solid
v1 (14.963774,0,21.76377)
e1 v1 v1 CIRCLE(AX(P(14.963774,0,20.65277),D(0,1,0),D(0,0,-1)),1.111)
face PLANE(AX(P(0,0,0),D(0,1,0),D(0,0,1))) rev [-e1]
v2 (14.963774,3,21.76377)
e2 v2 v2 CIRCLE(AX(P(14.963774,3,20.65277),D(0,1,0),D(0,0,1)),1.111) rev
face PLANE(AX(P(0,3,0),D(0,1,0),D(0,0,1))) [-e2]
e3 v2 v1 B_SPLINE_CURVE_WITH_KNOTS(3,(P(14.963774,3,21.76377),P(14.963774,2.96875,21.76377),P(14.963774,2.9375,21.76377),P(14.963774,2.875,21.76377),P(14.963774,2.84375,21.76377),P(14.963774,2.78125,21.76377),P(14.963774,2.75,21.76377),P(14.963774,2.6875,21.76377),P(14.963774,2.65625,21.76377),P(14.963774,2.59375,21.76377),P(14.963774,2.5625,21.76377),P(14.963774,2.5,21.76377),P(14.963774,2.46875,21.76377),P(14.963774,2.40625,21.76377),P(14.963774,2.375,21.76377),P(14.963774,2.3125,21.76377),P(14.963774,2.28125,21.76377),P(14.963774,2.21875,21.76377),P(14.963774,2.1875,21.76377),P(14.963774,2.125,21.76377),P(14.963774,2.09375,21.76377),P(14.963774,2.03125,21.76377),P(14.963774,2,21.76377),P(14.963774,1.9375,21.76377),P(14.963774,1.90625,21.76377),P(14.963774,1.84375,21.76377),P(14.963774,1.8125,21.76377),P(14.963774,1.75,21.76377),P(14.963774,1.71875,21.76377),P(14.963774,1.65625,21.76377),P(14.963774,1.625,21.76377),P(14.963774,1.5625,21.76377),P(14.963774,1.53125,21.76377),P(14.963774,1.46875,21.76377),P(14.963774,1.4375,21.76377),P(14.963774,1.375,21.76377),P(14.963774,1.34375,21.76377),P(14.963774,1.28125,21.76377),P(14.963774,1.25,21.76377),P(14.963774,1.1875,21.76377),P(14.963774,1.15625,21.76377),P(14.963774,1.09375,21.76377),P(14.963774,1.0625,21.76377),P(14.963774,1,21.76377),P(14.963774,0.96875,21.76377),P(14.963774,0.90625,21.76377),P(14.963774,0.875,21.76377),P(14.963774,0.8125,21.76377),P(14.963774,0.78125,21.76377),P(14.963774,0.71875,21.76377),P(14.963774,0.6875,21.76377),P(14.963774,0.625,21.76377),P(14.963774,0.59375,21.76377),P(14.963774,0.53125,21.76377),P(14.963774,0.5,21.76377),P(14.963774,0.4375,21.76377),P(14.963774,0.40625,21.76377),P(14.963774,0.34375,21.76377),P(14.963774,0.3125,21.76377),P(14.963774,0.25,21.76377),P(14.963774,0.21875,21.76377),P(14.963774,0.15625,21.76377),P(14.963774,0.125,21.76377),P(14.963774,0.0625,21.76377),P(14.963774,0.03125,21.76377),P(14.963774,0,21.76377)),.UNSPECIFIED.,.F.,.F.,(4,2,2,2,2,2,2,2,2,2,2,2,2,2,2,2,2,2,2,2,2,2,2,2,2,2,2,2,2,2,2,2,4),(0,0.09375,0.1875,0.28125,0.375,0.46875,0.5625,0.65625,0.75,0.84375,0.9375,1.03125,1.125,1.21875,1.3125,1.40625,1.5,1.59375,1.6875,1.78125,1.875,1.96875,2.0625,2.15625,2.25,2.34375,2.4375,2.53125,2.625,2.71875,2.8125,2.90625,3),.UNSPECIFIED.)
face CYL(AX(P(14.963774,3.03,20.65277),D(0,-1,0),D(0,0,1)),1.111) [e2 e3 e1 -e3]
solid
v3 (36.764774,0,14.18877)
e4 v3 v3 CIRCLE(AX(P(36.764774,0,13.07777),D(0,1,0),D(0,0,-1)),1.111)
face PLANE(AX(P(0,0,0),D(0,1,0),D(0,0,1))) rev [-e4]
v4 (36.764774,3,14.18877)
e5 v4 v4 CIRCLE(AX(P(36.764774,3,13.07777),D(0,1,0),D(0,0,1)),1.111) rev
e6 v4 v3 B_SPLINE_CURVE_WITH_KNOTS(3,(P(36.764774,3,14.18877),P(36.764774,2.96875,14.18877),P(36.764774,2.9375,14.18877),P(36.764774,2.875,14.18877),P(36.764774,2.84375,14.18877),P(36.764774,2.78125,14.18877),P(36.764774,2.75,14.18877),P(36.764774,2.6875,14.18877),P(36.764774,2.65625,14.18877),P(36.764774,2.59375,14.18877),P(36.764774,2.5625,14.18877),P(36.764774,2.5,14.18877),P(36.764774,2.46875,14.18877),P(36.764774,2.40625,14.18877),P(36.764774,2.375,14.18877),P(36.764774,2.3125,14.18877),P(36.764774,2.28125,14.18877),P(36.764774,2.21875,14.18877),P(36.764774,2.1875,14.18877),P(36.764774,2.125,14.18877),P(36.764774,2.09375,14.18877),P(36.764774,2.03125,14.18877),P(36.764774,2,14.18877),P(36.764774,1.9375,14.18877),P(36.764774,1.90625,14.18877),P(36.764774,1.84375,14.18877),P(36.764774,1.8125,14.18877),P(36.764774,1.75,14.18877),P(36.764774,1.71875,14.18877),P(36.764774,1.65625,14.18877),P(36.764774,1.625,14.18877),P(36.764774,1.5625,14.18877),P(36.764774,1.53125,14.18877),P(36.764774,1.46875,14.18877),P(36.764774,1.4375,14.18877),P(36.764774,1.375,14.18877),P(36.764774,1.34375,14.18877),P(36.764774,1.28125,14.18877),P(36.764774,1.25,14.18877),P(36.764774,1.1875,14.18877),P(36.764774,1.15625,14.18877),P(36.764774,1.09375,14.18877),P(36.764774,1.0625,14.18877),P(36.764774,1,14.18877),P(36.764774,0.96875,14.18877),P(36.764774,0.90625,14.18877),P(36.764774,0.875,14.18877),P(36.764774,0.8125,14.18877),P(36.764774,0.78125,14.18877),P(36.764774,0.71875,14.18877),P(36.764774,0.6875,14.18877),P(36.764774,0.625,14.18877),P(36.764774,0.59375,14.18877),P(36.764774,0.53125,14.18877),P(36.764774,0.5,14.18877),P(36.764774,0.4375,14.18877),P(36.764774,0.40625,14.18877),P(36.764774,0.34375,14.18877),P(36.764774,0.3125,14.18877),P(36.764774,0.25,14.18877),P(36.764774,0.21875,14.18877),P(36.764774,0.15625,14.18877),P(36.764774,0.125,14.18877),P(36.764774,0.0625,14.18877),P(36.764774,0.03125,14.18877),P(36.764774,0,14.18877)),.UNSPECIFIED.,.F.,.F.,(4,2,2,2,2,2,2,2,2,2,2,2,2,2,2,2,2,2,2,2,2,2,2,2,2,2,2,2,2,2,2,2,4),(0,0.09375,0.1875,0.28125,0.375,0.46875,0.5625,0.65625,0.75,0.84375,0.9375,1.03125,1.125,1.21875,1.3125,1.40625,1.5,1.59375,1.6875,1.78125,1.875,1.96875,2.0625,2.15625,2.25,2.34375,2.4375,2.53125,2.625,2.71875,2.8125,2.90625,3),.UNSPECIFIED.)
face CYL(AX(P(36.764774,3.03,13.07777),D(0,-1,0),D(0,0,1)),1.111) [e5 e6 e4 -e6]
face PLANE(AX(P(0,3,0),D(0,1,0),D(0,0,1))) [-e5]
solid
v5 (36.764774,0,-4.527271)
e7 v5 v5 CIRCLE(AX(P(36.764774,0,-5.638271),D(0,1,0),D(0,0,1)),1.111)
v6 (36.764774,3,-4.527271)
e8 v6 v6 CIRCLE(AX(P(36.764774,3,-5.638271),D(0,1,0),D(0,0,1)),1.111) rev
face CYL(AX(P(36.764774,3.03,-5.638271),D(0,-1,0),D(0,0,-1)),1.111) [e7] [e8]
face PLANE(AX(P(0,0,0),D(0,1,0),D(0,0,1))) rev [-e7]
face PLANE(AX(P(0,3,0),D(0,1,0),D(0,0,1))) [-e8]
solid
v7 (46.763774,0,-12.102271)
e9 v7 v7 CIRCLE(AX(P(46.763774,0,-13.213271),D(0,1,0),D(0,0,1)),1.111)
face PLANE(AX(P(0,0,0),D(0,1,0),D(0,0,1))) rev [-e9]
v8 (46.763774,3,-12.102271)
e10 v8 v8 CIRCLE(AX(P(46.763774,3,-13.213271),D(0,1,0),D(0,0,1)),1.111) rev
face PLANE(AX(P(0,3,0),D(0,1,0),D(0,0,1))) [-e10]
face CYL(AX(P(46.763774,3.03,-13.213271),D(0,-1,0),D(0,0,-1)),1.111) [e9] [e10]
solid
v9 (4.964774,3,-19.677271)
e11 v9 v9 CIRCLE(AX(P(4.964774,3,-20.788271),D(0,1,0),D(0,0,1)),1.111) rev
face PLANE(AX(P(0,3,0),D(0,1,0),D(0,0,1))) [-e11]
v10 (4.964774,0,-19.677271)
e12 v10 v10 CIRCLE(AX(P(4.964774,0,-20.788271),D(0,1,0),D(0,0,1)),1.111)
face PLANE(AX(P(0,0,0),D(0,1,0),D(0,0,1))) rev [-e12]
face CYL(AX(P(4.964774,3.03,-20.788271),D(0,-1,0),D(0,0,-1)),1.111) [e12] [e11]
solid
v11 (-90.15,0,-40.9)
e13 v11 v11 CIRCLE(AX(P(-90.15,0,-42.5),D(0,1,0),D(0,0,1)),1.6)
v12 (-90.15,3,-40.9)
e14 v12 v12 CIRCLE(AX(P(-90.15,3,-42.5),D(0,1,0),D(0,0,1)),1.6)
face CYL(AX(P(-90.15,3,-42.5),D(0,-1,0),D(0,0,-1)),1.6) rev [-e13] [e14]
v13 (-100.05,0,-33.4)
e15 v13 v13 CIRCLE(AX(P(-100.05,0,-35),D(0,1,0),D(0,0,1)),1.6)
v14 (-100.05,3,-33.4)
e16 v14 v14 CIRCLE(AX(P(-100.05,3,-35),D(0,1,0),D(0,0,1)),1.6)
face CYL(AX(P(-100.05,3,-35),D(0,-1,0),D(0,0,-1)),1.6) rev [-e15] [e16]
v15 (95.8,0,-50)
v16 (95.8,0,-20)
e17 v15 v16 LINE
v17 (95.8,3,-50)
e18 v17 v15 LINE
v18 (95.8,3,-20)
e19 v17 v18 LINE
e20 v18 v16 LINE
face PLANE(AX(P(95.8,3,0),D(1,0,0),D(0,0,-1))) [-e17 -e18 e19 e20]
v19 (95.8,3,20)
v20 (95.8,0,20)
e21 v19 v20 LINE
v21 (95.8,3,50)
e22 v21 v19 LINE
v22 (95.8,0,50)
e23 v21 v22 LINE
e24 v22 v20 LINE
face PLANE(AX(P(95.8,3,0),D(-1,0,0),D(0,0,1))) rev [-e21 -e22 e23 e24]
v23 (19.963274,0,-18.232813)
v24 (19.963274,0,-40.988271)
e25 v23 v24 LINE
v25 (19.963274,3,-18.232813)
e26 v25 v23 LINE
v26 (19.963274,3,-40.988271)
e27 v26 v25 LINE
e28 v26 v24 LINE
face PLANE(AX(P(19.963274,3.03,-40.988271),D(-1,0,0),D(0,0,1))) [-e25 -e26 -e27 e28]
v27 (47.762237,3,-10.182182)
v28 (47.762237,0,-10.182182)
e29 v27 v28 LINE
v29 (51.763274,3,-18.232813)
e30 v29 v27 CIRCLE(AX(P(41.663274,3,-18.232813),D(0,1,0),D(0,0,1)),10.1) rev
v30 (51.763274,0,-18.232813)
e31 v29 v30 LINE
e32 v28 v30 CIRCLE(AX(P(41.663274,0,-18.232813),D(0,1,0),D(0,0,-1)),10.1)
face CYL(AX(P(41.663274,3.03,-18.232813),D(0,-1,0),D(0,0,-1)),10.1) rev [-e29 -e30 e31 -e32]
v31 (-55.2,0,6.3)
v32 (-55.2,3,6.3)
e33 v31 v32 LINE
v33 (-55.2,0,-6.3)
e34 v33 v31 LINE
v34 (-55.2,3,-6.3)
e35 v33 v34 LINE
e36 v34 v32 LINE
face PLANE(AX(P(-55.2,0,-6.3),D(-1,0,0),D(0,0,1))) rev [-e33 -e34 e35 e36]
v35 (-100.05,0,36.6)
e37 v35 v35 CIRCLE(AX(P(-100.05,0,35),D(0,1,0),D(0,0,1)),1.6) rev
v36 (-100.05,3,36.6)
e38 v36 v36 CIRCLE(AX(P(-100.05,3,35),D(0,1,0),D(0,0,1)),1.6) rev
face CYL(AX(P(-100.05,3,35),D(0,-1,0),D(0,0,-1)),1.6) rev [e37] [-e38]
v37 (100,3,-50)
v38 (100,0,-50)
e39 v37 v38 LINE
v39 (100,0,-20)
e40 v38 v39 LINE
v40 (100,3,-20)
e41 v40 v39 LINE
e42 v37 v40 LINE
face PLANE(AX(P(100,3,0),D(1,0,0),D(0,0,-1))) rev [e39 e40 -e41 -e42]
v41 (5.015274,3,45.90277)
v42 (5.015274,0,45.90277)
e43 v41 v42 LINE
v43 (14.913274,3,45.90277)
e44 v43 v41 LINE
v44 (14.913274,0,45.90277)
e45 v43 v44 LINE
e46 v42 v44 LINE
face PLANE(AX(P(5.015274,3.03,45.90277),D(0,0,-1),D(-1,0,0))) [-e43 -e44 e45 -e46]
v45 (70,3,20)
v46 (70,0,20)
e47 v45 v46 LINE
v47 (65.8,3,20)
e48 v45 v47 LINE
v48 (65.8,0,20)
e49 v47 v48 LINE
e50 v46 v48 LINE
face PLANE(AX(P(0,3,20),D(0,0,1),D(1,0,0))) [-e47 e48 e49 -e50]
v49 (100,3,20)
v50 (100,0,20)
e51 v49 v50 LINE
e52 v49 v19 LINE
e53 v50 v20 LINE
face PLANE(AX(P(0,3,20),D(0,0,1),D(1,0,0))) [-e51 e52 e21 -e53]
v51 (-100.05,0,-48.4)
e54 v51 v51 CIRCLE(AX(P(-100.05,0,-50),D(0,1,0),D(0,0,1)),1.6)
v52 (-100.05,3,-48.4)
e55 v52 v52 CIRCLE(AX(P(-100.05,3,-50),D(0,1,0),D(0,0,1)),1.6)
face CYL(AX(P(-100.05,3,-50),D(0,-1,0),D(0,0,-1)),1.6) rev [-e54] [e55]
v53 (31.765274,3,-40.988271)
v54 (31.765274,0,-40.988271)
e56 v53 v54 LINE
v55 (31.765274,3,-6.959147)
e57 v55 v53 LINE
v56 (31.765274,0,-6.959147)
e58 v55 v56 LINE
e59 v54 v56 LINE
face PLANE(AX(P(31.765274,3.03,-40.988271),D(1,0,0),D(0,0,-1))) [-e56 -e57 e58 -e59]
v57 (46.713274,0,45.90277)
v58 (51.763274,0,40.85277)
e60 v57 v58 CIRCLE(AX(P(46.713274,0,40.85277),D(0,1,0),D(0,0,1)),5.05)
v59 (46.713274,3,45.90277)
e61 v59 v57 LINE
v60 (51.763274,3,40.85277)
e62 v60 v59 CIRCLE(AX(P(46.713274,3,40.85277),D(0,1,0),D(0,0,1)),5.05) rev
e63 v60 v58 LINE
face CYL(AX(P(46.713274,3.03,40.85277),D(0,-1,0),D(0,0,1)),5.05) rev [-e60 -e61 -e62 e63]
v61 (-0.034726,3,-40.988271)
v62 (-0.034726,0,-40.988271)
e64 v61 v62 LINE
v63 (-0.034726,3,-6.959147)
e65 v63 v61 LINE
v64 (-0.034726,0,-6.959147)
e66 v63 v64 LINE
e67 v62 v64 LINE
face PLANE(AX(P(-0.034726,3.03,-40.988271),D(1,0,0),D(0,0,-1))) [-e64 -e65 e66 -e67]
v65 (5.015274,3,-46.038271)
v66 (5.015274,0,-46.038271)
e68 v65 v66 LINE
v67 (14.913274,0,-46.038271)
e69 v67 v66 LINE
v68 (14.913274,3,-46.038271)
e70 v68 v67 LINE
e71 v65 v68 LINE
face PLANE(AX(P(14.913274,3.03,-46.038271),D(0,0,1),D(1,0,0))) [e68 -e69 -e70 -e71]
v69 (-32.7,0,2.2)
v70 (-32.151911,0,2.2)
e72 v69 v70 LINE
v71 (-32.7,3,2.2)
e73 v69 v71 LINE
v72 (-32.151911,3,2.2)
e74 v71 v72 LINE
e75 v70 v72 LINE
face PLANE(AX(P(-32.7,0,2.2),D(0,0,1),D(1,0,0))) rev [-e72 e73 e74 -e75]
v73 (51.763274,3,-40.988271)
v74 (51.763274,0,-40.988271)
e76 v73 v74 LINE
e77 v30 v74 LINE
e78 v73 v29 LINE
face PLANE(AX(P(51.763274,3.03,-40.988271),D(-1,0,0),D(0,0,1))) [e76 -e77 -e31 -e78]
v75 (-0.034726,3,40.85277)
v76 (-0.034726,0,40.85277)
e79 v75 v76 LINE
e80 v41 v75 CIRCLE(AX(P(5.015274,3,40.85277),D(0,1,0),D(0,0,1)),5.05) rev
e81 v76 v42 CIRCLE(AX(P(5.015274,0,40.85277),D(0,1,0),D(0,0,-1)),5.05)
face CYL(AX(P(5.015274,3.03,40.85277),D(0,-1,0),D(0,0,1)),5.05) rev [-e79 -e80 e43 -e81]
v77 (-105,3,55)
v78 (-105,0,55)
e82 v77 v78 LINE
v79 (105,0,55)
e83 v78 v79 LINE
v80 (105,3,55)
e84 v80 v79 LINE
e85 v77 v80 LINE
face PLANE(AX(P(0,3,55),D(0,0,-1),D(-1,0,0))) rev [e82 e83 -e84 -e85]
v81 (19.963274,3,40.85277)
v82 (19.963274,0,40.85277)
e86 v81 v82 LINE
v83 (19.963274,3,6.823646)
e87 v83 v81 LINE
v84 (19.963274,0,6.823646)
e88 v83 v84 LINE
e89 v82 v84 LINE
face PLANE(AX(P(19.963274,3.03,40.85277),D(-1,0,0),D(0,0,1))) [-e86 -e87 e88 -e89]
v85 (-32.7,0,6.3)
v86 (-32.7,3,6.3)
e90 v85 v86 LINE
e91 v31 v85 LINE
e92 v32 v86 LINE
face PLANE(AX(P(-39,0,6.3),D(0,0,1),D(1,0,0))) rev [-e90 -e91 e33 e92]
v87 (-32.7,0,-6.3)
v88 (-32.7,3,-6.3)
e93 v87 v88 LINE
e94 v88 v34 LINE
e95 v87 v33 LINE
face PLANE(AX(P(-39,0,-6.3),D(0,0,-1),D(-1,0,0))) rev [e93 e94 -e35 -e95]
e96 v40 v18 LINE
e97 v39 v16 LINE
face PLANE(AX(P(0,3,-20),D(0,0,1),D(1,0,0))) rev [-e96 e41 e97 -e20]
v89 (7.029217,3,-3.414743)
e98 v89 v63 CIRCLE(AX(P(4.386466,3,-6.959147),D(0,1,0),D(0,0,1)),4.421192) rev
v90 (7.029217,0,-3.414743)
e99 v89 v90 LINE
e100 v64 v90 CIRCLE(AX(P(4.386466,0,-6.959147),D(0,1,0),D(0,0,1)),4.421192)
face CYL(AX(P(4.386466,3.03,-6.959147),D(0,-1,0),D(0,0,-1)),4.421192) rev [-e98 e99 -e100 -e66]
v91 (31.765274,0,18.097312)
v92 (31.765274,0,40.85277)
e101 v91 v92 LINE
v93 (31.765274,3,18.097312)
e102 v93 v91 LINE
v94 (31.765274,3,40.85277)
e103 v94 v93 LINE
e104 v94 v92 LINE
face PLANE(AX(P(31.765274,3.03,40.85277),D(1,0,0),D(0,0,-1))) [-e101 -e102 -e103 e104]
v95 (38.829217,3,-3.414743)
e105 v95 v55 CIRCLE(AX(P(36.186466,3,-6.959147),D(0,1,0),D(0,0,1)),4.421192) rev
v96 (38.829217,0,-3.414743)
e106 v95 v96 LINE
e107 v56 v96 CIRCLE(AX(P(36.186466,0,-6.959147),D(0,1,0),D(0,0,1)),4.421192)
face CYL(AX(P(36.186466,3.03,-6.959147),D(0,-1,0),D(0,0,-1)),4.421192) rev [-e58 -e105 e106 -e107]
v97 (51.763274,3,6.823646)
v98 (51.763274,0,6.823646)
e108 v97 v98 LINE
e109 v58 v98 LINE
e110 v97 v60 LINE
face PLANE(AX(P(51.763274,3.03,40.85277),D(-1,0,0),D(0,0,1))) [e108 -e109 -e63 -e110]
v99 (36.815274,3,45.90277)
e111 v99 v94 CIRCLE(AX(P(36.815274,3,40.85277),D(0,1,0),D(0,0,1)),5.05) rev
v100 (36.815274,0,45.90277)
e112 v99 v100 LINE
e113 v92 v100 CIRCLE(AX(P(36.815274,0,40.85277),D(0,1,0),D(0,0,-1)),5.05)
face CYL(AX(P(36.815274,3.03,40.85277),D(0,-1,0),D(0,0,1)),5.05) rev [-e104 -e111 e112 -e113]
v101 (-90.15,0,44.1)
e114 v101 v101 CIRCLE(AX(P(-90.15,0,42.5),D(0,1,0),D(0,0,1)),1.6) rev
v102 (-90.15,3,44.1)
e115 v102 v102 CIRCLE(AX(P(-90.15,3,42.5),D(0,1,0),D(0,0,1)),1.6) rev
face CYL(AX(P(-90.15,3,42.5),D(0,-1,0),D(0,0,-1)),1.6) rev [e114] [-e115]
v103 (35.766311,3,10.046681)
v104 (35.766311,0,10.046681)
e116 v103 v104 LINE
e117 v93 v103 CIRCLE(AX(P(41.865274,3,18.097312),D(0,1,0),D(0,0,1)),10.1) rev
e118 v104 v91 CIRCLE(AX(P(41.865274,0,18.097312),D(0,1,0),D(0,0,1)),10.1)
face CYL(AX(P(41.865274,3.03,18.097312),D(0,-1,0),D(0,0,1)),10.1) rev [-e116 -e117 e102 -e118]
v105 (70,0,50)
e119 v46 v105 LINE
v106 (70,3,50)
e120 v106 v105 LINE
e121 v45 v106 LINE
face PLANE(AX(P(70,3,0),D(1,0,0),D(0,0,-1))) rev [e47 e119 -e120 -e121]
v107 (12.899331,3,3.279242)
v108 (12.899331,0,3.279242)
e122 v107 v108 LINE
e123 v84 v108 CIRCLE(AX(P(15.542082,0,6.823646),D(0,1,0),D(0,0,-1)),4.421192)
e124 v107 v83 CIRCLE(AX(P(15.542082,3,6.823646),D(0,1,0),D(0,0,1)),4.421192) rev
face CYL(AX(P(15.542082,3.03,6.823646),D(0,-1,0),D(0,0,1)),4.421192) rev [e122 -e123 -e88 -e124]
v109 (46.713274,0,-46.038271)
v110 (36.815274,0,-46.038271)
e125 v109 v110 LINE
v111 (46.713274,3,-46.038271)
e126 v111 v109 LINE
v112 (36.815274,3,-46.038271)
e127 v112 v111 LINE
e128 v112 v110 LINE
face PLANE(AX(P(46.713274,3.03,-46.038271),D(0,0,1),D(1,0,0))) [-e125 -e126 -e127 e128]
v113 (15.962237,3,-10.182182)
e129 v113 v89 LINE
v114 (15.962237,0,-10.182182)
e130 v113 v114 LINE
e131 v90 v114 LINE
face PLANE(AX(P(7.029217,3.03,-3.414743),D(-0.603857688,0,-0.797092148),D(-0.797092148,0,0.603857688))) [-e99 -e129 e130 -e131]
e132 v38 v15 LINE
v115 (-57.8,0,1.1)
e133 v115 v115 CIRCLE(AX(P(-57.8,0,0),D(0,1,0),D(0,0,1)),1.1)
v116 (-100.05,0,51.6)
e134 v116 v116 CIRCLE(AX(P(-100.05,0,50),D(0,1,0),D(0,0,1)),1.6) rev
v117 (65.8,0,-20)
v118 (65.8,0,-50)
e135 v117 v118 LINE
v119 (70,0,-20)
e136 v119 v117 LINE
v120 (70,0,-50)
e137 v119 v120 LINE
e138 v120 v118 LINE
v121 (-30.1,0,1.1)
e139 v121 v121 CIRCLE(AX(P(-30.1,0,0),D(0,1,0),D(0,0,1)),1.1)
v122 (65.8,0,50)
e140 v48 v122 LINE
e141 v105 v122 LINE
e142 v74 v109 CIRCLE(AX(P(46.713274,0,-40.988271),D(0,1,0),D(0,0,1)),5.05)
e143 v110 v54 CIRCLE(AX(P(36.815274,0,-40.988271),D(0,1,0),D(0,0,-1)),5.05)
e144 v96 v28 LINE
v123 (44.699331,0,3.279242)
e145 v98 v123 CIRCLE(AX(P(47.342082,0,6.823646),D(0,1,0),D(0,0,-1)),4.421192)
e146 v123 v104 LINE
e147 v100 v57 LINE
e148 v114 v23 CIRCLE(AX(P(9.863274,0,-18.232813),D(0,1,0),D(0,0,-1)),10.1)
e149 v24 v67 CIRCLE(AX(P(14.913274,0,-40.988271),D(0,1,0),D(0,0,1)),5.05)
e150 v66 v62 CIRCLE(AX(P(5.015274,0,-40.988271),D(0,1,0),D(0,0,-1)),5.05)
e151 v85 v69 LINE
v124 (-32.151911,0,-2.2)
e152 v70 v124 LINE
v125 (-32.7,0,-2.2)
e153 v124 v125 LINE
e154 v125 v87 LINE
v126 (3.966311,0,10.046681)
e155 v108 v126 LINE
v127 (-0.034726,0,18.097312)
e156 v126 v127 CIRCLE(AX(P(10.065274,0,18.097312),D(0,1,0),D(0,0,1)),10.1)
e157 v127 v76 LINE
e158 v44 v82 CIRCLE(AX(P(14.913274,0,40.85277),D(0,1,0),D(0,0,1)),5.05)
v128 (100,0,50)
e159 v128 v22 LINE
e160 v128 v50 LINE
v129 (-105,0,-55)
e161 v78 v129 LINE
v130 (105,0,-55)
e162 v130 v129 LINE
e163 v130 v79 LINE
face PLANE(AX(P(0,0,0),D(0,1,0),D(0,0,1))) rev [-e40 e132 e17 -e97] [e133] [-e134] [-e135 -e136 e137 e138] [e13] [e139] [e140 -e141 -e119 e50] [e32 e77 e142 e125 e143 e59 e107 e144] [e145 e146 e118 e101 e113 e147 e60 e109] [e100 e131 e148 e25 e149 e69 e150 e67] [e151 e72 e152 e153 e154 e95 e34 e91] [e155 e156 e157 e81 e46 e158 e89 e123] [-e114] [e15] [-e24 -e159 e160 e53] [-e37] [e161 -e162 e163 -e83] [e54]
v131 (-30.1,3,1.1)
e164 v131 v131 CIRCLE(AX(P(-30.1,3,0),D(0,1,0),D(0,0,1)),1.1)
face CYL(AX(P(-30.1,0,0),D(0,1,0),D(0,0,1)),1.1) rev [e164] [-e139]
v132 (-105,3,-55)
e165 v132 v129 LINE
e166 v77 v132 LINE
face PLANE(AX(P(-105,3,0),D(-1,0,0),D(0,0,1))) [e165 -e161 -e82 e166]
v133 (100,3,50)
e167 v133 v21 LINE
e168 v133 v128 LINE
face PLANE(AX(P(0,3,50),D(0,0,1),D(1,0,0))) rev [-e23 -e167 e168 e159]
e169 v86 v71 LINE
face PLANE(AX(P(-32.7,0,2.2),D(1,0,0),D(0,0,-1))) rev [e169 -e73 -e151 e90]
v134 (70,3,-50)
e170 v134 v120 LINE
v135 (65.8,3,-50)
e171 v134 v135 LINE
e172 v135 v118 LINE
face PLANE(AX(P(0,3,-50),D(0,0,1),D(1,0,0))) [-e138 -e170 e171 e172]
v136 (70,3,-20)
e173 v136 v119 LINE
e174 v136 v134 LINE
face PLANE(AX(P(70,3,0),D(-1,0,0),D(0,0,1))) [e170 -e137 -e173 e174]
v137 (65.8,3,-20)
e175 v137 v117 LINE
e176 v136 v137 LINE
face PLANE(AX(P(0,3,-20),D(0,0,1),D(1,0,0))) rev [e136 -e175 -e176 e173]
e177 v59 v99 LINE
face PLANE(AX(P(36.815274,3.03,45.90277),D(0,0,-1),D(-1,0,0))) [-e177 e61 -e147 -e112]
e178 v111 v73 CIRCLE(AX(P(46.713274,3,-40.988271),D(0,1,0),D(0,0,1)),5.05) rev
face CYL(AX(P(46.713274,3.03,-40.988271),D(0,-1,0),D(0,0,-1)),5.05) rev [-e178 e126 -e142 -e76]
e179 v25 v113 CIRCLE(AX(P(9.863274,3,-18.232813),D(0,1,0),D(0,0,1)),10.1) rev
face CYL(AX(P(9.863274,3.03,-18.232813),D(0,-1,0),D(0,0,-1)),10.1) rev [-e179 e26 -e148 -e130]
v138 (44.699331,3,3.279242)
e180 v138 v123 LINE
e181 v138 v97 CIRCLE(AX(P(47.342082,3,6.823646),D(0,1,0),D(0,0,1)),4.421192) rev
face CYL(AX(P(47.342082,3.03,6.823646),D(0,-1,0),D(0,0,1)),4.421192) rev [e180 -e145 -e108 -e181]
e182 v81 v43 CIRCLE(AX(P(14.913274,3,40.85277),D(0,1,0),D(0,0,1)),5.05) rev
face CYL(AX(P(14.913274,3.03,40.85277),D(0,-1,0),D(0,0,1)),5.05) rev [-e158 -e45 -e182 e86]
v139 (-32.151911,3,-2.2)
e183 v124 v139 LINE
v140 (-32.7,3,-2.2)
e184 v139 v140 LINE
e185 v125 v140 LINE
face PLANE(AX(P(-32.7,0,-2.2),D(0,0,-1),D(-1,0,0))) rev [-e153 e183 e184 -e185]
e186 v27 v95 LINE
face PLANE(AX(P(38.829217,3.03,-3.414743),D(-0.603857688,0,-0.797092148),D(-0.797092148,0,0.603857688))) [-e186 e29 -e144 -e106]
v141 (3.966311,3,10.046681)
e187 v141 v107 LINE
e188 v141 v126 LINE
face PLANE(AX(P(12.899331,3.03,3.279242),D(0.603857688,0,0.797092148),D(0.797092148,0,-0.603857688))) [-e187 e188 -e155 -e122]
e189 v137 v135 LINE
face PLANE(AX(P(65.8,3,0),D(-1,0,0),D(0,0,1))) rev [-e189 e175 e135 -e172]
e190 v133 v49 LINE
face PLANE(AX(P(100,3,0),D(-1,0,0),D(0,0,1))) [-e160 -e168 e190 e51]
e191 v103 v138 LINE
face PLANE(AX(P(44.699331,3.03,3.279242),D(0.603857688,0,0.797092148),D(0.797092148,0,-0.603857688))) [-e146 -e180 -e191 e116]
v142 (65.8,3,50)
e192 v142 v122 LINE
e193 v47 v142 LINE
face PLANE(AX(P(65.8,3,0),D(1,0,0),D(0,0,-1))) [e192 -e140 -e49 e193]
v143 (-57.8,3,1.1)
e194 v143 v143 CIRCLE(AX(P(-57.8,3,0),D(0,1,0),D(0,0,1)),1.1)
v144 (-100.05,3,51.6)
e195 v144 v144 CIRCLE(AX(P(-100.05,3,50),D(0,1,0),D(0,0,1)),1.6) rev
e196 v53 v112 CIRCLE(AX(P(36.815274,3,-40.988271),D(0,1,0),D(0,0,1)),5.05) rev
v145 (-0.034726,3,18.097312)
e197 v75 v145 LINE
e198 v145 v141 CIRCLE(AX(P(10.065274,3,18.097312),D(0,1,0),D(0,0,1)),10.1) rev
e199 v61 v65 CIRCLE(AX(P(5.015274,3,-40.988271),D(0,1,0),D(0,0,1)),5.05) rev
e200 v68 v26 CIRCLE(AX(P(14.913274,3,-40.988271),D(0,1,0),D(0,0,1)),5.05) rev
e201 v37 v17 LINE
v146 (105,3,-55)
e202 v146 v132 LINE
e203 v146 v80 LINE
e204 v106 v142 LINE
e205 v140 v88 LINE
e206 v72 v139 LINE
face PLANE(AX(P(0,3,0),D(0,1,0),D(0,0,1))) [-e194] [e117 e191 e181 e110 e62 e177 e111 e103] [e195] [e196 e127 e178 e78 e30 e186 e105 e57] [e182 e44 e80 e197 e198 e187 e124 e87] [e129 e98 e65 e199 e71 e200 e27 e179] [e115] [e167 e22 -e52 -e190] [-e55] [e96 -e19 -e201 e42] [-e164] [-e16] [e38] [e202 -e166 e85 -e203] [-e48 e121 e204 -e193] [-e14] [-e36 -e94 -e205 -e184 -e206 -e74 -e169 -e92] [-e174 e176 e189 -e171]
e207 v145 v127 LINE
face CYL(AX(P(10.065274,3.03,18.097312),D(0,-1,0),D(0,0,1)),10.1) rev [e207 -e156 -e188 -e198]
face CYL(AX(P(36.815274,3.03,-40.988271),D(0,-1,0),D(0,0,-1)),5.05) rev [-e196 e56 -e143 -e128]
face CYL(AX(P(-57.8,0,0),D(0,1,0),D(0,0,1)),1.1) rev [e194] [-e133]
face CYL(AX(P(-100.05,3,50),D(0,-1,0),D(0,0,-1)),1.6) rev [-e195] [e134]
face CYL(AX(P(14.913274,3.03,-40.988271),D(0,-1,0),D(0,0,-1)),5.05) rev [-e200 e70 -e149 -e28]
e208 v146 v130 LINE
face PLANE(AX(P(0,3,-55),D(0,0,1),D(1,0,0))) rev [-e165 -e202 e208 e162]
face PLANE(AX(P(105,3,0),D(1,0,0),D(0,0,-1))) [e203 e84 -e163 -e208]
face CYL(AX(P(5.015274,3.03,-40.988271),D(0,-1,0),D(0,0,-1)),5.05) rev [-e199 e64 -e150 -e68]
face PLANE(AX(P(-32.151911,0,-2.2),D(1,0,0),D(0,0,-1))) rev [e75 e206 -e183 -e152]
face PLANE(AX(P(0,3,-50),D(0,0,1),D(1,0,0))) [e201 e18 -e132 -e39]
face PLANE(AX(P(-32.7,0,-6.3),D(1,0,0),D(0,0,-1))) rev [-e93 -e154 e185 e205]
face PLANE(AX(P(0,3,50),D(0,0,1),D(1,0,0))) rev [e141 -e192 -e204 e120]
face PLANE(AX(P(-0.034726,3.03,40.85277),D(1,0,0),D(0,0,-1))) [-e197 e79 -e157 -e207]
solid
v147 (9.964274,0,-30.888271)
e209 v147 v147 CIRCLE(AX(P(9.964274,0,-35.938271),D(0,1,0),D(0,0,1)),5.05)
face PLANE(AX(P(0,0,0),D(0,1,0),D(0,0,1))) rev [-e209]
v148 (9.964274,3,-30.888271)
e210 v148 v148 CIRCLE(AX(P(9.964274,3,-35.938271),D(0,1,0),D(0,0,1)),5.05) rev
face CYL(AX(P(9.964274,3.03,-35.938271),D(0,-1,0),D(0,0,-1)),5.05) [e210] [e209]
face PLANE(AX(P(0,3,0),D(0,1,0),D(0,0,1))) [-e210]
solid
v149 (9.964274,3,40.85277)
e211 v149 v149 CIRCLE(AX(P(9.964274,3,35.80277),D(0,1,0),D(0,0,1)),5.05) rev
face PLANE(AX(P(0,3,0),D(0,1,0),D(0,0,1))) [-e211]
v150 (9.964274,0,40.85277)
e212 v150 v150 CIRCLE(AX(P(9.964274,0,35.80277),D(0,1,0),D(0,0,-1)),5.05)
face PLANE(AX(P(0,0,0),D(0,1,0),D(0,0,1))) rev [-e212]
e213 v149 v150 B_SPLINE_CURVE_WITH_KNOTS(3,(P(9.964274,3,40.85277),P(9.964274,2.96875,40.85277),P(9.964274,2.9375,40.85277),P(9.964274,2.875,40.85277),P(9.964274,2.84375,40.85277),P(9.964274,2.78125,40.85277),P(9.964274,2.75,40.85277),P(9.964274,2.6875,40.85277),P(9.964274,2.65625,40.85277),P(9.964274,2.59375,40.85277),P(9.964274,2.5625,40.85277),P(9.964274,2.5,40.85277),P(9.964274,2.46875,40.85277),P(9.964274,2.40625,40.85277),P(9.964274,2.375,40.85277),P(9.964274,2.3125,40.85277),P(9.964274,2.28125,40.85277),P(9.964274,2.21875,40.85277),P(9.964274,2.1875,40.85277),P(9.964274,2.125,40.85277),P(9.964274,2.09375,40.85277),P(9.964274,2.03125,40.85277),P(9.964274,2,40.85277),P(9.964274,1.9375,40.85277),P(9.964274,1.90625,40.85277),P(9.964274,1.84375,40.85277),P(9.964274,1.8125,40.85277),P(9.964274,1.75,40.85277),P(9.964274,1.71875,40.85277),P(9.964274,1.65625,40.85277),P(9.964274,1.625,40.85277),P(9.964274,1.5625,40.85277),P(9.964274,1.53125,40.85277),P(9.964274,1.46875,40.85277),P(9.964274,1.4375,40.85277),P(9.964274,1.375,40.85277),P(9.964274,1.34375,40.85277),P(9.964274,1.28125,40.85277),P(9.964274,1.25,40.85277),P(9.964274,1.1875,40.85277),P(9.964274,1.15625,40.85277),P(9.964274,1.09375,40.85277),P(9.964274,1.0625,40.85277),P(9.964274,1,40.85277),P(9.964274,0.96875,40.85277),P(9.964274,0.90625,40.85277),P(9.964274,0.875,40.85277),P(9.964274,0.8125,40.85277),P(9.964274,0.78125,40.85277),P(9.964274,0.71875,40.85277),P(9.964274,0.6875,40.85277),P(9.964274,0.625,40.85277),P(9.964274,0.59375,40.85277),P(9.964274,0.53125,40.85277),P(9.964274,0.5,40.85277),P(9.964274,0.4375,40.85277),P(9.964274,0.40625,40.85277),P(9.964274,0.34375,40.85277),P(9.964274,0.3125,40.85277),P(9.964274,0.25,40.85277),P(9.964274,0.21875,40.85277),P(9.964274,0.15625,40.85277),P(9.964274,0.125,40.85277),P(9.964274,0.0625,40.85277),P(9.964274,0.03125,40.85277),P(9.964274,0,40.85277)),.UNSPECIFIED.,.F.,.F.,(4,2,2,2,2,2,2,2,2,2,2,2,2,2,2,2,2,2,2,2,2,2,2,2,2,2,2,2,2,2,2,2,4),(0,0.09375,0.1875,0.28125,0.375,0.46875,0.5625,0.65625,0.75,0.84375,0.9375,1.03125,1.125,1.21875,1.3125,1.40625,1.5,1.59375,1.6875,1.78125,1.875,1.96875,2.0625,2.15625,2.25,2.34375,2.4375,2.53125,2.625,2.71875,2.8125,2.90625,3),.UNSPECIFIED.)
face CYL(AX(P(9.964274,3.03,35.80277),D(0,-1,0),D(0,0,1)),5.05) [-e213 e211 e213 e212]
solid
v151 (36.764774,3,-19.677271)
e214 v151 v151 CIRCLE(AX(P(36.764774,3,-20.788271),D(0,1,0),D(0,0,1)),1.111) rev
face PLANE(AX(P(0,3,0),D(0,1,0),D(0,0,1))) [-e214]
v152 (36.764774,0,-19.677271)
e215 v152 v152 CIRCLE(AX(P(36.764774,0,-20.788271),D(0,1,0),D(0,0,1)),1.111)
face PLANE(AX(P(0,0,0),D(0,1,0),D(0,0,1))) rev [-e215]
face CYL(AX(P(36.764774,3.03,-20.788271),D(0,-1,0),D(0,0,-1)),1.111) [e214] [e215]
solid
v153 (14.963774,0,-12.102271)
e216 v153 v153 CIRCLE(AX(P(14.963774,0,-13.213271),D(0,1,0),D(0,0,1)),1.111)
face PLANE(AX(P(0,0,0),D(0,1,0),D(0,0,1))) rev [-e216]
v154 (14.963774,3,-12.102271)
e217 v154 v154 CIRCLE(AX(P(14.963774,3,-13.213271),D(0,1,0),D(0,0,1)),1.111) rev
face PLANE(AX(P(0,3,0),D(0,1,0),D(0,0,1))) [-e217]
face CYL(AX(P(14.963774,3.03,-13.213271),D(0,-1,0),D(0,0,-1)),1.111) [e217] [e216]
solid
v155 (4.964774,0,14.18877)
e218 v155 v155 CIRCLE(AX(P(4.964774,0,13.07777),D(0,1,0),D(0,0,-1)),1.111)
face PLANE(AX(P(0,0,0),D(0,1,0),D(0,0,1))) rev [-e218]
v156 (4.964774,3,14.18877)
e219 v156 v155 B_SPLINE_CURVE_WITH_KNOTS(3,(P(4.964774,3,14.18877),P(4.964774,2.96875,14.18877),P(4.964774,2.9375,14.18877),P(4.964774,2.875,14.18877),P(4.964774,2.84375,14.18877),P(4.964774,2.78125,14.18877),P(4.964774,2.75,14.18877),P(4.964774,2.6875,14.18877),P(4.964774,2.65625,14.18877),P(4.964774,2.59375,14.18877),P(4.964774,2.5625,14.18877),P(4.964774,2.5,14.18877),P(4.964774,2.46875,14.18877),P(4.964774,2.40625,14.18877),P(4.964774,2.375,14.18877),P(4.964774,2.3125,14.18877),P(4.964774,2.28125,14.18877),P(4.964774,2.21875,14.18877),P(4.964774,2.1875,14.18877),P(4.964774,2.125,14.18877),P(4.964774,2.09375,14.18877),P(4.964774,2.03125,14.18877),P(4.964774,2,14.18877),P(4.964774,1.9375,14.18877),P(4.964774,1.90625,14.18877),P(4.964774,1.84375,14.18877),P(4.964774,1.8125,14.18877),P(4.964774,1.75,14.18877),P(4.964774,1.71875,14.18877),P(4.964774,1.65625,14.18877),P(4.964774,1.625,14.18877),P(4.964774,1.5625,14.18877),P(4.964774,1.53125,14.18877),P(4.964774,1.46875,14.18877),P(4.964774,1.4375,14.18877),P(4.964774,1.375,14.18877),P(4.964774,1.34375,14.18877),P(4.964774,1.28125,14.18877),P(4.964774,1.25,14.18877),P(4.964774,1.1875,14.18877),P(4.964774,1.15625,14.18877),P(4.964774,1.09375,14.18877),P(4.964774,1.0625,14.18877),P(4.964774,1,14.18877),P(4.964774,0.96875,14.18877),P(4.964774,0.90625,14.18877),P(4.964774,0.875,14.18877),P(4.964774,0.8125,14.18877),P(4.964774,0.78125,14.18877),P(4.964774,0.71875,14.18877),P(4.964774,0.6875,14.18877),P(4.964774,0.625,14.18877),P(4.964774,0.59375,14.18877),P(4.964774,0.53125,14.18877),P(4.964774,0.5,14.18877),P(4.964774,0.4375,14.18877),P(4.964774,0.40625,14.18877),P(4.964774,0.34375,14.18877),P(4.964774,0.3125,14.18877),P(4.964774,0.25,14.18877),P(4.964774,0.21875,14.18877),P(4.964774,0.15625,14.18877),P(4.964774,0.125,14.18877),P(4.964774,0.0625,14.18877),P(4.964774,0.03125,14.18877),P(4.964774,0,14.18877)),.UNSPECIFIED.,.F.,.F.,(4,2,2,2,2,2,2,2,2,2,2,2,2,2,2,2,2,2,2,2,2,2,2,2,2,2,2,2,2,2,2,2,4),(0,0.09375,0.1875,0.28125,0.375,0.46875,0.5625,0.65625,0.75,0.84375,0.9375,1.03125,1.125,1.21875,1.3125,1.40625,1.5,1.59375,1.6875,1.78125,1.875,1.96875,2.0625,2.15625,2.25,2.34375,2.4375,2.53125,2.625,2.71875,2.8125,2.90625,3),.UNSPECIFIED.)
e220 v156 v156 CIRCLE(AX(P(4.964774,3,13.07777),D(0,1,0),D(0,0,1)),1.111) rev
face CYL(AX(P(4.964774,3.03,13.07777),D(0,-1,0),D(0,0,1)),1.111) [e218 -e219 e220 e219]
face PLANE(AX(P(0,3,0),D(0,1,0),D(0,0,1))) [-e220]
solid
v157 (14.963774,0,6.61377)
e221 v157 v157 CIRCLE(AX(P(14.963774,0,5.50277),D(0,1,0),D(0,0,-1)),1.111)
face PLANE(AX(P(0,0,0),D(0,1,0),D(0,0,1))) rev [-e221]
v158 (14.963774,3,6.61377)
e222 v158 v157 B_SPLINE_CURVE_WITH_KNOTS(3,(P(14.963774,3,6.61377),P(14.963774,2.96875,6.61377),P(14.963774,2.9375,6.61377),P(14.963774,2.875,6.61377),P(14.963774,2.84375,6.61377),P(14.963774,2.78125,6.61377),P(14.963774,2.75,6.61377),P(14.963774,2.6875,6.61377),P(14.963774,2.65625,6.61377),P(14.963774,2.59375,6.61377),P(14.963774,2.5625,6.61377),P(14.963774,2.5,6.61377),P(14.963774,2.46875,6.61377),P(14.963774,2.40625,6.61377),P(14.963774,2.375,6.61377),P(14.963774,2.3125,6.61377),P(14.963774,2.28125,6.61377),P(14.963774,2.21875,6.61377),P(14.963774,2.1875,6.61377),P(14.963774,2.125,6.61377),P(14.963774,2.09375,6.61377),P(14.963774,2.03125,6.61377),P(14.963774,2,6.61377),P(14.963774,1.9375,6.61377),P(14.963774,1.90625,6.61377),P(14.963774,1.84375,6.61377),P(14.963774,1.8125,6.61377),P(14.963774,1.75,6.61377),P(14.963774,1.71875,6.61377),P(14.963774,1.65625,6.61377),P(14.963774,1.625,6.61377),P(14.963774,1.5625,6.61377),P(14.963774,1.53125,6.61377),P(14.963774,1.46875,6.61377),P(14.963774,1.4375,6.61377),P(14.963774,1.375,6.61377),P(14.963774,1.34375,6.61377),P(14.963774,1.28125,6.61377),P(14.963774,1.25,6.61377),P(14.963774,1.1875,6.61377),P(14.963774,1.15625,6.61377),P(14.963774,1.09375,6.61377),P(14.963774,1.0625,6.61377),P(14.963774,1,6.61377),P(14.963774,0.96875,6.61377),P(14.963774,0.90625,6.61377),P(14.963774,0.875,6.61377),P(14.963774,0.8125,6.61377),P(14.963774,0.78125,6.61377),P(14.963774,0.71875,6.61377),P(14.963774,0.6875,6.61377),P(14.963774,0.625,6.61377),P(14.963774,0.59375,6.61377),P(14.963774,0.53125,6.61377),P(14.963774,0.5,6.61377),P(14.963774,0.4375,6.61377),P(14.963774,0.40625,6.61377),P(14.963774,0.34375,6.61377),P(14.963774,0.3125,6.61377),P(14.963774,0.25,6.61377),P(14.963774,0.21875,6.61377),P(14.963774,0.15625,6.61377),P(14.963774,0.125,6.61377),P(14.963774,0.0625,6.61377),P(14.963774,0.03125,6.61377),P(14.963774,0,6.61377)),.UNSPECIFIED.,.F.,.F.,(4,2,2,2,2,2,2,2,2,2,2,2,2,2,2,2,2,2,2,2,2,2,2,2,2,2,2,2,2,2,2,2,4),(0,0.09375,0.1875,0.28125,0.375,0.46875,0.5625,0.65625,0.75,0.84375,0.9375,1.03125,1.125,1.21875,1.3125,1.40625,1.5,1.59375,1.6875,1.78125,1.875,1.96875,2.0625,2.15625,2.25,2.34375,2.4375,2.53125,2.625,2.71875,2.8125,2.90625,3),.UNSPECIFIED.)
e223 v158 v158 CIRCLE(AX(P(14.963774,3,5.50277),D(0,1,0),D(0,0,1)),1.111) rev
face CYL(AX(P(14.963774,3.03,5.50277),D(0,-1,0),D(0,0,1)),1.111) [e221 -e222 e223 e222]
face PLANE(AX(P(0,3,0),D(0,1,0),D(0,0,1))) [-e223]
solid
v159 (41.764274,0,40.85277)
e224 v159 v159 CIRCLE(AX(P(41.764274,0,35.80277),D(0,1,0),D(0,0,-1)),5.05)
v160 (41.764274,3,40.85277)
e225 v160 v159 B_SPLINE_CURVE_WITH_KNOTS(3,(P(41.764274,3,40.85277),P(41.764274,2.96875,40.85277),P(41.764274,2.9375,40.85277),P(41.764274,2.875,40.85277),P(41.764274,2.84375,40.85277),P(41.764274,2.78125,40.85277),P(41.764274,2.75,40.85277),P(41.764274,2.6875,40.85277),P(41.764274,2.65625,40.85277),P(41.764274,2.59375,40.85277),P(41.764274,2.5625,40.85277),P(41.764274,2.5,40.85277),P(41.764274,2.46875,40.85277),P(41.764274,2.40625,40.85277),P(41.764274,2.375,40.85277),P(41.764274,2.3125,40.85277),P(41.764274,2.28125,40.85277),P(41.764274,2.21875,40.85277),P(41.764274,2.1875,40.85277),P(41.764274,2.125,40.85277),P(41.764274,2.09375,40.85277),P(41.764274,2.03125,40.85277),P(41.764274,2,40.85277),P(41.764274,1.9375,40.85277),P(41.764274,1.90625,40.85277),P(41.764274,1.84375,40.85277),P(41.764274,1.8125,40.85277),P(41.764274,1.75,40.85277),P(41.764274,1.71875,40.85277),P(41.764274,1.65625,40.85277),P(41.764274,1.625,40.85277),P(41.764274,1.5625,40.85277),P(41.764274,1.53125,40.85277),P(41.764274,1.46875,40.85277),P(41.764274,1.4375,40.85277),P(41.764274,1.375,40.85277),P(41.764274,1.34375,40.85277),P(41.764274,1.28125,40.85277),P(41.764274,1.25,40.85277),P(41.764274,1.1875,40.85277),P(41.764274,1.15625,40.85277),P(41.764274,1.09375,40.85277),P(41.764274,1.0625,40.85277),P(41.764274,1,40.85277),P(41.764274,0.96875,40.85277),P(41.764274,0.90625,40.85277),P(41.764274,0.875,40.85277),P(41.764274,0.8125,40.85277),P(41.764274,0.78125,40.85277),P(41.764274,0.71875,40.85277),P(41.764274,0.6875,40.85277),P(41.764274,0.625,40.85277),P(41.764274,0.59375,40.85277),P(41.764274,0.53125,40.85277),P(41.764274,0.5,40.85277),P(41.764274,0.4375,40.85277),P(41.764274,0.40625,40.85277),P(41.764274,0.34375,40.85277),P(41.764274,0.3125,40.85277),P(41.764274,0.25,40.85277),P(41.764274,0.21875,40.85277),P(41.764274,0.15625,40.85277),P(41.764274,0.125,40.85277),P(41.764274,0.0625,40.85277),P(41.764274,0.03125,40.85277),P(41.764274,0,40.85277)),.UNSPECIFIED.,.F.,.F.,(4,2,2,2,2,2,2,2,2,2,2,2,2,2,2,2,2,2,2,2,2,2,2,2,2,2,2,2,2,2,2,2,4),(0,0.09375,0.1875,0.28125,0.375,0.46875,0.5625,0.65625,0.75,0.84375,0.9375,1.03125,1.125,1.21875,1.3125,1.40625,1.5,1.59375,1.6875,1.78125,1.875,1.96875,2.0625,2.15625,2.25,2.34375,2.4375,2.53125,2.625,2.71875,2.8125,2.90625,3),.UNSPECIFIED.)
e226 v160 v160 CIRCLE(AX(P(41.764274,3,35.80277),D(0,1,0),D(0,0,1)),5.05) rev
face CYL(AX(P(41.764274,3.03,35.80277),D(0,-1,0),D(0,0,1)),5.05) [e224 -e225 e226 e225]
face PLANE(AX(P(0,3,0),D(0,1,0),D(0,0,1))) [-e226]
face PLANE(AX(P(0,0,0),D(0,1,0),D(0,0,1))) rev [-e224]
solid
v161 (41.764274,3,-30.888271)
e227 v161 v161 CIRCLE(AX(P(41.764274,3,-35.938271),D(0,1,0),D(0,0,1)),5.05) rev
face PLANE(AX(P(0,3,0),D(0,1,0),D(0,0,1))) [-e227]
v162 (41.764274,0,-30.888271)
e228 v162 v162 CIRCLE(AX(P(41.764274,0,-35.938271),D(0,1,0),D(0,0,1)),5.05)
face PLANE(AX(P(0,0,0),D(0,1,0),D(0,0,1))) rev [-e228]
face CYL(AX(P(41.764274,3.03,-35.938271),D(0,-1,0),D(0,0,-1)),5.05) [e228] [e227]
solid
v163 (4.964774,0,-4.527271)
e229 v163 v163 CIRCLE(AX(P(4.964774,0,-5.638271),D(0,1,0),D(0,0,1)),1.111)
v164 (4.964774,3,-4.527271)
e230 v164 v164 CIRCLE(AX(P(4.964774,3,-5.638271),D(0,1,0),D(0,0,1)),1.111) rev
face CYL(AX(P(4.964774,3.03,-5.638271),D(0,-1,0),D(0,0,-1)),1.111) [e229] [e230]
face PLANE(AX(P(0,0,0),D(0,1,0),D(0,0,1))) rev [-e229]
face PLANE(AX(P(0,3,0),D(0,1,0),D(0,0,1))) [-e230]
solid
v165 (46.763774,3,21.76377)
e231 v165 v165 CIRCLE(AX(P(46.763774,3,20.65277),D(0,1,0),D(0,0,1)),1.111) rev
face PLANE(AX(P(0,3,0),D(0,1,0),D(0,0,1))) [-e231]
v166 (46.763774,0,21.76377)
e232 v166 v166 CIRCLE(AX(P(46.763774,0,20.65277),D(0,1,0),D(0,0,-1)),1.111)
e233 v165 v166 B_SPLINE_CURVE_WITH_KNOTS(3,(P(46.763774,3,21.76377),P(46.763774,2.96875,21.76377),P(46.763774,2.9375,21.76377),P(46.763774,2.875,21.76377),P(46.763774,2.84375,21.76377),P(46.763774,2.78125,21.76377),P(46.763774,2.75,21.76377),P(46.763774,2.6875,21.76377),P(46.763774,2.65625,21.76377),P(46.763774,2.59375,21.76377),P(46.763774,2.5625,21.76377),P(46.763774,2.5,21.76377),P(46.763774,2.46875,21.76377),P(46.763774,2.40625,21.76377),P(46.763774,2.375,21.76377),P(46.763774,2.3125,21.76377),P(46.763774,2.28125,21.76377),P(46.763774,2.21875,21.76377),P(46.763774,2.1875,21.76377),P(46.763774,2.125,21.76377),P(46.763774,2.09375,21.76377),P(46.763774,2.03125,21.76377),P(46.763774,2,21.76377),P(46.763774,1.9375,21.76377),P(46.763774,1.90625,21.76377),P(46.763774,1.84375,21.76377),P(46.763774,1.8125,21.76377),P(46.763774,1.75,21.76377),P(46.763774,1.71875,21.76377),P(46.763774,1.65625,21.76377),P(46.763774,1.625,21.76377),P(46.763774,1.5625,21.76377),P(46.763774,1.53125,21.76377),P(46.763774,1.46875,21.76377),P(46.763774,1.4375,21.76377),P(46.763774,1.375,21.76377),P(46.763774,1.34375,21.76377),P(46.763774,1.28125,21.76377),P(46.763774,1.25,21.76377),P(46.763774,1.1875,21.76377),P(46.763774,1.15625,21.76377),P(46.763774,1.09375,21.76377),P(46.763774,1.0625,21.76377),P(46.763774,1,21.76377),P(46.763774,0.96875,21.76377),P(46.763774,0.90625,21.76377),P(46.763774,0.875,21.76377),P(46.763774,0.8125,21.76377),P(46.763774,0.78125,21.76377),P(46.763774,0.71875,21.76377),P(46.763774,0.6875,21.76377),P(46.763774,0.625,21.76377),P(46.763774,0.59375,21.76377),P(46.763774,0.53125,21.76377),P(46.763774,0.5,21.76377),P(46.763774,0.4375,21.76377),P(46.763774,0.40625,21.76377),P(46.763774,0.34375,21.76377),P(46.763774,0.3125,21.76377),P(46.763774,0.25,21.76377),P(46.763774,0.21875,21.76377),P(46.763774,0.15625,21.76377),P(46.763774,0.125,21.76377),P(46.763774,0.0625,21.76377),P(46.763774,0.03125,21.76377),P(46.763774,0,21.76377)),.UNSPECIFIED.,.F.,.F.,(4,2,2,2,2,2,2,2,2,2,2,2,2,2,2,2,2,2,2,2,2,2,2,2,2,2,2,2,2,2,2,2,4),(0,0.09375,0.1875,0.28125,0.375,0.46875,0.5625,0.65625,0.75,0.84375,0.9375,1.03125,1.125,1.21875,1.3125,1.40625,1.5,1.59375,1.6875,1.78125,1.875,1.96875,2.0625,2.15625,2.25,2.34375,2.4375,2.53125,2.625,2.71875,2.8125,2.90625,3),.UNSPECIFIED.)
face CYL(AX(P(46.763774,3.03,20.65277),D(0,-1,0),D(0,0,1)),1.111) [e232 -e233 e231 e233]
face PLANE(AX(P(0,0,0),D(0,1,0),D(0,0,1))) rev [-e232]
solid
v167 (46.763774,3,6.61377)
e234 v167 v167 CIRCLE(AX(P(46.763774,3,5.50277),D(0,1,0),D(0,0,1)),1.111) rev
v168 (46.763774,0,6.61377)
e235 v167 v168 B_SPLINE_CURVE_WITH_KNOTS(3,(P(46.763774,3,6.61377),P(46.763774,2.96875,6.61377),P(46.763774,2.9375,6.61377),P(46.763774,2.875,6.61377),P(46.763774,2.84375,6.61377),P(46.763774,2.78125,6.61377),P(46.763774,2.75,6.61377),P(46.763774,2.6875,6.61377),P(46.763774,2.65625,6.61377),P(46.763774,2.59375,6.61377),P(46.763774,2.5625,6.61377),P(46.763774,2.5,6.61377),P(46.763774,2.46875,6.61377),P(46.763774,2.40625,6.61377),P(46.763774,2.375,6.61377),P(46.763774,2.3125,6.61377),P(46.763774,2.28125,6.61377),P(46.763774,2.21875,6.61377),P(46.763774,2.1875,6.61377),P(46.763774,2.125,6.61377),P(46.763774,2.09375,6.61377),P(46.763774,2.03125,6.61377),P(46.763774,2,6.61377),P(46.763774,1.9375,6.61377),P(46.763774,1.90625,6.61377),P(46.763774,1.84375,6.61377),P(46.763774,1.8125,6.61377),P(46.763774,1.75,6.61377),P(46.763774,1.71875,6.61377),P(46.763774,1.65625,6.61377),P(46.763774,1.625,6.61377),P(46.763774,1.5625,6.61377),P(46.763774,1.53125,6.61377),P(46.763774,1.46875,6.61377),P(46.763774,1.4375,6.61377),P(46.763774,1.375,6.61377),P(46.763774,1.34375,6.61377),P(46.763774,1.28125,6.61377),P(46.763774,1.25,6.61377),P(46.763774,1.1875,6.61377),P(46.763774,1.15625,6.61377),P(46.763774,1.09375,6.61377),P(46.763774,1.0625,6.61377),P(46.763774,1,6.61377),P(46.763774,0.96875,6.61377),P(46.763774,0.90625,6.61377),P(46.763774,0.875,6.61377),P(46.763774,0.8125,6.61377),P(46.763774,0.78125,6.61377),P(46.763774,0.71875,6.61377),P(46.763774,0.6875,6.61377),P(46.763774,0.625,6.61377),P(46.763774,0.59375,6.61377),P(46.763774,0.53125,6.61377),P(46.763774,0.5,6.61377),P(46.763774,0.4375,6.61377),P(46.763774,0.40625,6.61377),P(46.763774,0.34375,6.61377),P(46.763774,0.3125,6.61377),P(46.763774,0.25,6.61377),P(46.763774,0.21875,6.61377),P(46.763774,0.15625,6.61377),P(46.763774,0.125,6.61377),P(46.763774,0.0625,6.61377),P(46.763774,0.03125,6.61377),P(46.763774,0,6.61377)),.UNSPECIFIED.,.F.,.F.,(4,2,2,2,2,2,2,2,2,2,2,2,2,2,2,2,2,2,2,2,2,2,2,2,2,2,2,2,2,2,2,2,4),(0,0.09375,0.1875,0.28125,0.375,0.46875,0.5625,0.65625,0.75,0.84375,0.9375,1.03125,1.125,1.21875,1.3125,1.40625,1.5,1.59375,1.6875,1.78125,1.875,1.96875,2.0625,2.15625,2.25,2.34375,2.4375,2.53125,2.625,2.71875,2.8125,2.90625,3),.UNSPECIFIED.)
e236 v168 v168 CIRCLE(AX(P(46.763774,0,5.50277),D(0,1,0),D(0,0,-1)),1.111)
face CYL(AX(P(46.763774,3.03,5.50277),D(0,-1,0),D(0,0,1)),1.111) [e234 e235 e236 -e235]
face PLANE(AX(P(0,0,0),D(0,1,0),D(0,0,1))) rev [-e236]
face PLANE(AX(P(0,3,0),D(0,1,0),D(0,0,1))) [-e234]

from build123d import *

# Parameters (mm, degrees)
SKETCH2_R           = 1.6
SKETCH2_W           = 4.2
SKETCH2_H           = 30
BOSS_EXTRUDE1_DEPTH = 3
SKETCH3_R           = 1.1
CUT_EXTRUDE1_DEPTH  = 119.570654042
CAVITY2_OUTLINE_R   = 5.05
CAVITY2_OUTLINE_R_2 = 1.111
CAVITY2_DEPTH       = 3


# Read off the part's stored shape, not the designer's step: Cavity2
with BuildPart() as part:
    # Sketch2 → Boss-Extrude1 (new body)
    with BuildSketch(Plane(origin=(0, 0, 0), x_dir=(1, 0, 0), z_dir=(0, 1, 0))):
        Polygon((105, 55), (105, 50), (105, -55), (-105, -55), (-105, 55), (100, 55), align=None)
        with Locations(Location((-90.15, -42.5, 0), (0, 0, 270))):
            Circle(SKETCH2_R, mode=Mode.SUBTRACT)
        with Locations(Location((-100.05, 35, 0), (0, 0, 270))):
            Circle(SKETCH2_R, mode=Mode.SUBTRACT)
        with Locations(Location((-100.05, 50, 0), (0, 0, 270))):
            Circle(SKETCH2_R, mode=Mode.SUBTRACT)
        with Locations(Location((-90.15, 42.5, 0), (0, 0, 270))):
            Circle(SKETCH2_R, mode=Mode.SUBTRACT)
        with Locations(Location((-100.05, -50, 0), (0, 0, 270))):
            Circle(SKETCH2_R, mode=Mode.SUBTRACT)
        with Locations(Location((-100.05, -35, 0), (0, 0, 270))):
            Circle(SKETCH2_R, mode=Mode.SUBTRACT)
        with Locations((97.9, -35)):
            Rectangle(SKETCH2_W, SKETCH2_H, mode=Mode.SUBTRACT)
        Polygon((70, 20), (70, 50), (65.8, 50), (65.8, 20), (67.9, 20), align=None, mode=Mode.SUBTRACT)
        with Locations((97.9, 35)):
            Rectangle(SKETCH2_W, SKETCH2_H, mode=Mode.SUBTRACT)
        with Locations((67.9, -35)):
            Rectangle(SKETCH2_W, SKETCH2_H, mode=Mode.SUBTRACT)
    extrude(amount=BOSS_EXTRUDE1_DEPTH)

    # Sketch3 → Cut-Extrude1 (cut, through all)
    with BuildSketch(Plane(origin=(0, 3, 0), x_dir=(1, 0, 0), z_dir=(0, 1, 0))):
        with Locations(Location((-30.1, 0, 0), (0, 0, 270))):
            Circle(SKETCH3_R)
        with Locations(Location((-57.8, 0, 0), (0, 0, 270))):
            Circle(SKETCH3_R)
        Polygon((-32.7, -2.2), (-32.7, -6.3), (-39, -6.3), (-55.2, -6.3), (-55.2, 6.3), (-39, 6.3), (-32.7, 6.3), (-32.7, 2.2), (-32.151911073, 2.2), (-32.151911073, -2.2), align=None)
    extrude(amount=-CUT_EXTRUDE1_DEPTH, mode=Mode.SUBTRACT)

    # Cavity2 outline → Cavity2 (cut)
    # profile 1 of 4: a face of its own
    with BuildSketch(Plane(origin=(0, 0, 0), x_dir=(1, 0, 0), z_dir=(0, 1, 0))):
        with BuildLine():
            ThreePointArc((19.963273932, -6.823646195), (17.524861401, -2.871998028), (12.899330999, -3.279241706))
            Line((12.899330999, -3.279241706), (3.966311283, -10.046680884))
            ThreePointArc((3.966311283, -10.046680884), (1.020675468, -13.602287819), (-0.034726068, -18.097311581))
            Line((-0.034726068, -18.097311581), (-0.034726068, -40.852769787))
            ThreePointArc((-0.034726068, -40.852769787), (1.444384687, -44.423659032), (5.015273932, -45.902769787))
            Line((5.015273932, -45.902769787), (14.913273932, -45.902769787))
            ThreePointArc((14.913273932, -45.902769787), (18.484163177, -44.423659032), (19.963273932, -40.852769787))
            Line((19.963273932, -40.852769787), (19.963273932, -6.823646195))
        make_face()
        with Locations((9.964273932, -35.802769787)):
            Circle(CAVITY2_OUTLINE_R, mode=Mode.SUBTRACT)
        with Locations((4.964773932, -13.077769787)):
            Circle(CAVITY2_OUTLINE_R_2, mode=Mode.SUBTRACT)
        with Locations((14.963773932, -20.652769787)):
            Circle(CAVITY2_OUTLINE_R_2, mode=Mode.SUBTRACT)
        with Locations((14.963773932, -5.502769787)):
            Circle(CAVITY2_OUTLINE_R_2, mode=Mode.SUBTRACT)
    # profile 2 of 4: a face of its own
    with BuildSketch(Plane(origin=(0, 0, 0), x_dir=(1, 0, 0), z_dir=(0, 1, 0))):
        with BuildLine():
            Line((-0.034726068, 40.988271055), (-0.034726068, 6.959147464))
            ThreePointArc((-0.034726068, 6.959147464), (2.403686463, 3.007499297), (7.029216865, 3.414742974))
            Line((7.029216865, 3.414742974), (15.962236581, 10.182182153))
            ThreePointArc((15.962236581, 10.182182153), (18.907872396, 13.737789087), (19.963273932, 18.232812849))
            Line((19.963273932, 18.232812849), (19.963273932, 40.988271055))
            ThreePointArc((19.963273932, 40.988271055), (18.484163177, 44.5591603), (14.913273932, 46.038271055))
            Line((14.913273932, 46.038271055), (5.015273932, 46.038271055))
            ThreePointArc((5.015273932, 46.038271055), (1.444384687, 44.5591603), (-0.034726068, 40.988271055))
        make_face()
        with Locations((4.964773932, 5.638271055)):
            Circle(CAVITY2_OUTLINE_R_2, mode=Mode.SUBTRACT)
        with Locations((4.964773932, 20.788271055)):
            Circle(CAVITY2_OUTLINE_R_2, mode=Mode.SUBTRACT)
        with Locations((14.963773932, 13.213271055)):
            Circle(CAVITY2_OUTLINE_R_2, mode=Mode.SUBTRACT)
        with Locations((9.964273932, 35.938271055)):
            Circle(CAVITY2_OUTLINE_R, mode=Mode.SUBTRACT)
    # profile 3 of 4: a face of its own
    with BuildSketch(Plane(origin=(0, 0, 0), x_dir=(1, 0, 0), z_dir=(0, 1, 0))):
        with BuildLine():
            Line((36.815273932, -45.902769787), (46.713273932, -45.902769787))
            ThreePointArc((46.713273932, -45.902769787), (50.284163177, -44.423659032), (51.763273932, -40.852769787))
            Line((51.763273932, -40.852769787), (51.763273932, -6.823646195))
            ThreePointArc((51.763273932, -6.823646195), (49.324861401, -2.871998028), (44.699330999, -3.279241706))
            Line((44.699330999, -3.279241706), (35.766311283, -10.046680884))
            ThreePointArc((35.766311283, -10.046680884), (32.820675468, -13.602287819), (31.765273932, -18.097311581))
            Line((31.765273932, -18.097311581), (31.765273932, -40.852769787))
            ThreePointArc((31.765273932, -40.852769787), (33.244384687, -44.423659032), (36.815273932, -45.902769787))
        make_face()
        with Locations((41.764273932, -35.802769787)):
            Circle(CAVITY2_OUTLINE_R, mode=Mode.SUBTRACT)
        with Locations((36.764773932, -13.077769787)):
            Circle(CAVITY2_OUTLINE_R_2, mode=Mode.SUBTRACT)
        with Locations((46.763773932, -20.652769787)):
            Circle(CAVITY2_OUTLINE_R_2, mode=Mode.SUBTRACT)
        with Locations((46.763773932, -5.502769787)):
            Circle(CAVITY2_OUTLINE_R_2, mode=Mode.SUBTRACT)
    # profile 4 of 4: a face of its own
    with BuildSketch(Plane(origin=(0, 0, 0), x_dir=(1, 0, 0), z_dir=(0, 1, 0))):
        with BuildLine():
            ThreePointArc((31.765273932, 6.959147464), (34.203686463, 3.007499297), (38.829216865, 3.414742974))
            Line((38.829216865, 3.414742974), (47.762236581, 10.182182153))
            ThreePointArc((47.762236581, 10.182182153), (50.707872396, 13.737789087), (51.763273932, 18.232812849))
            Line((51.763273932, 18.232812849), (51.763273932, 40.988271055))
            ThreePointArc((51.763273932, 40.988271055), (50.284163177, 44.5591603), (46.713273932, 46.038271055))
            Line((46.713273932, 46.038271055), (36.815273932, 46.038271055))
            ThreePointArc((36.815273932, 46.038271055), (33.244384687, 44.5591603), (31.765273932, 40.988271055))
            Line((31.765273932, 40.988271055), (31.765273932, 6.959147464))
        make_face()
        with Locations((36.764773932, 5.638271055)):
            Circle(CAVITY2_OUTLINE_R_2, mode=Mode.SUBTRACT)
        with Locations((36.764773932, 20.788271055)):
            Circle(CAVITY2_OUTLINE_R_2, mode=Mode.SUBTRACT)
        with Locations((46.763773932, 13.213271055)):
            Circle(CAVITY2_OUTLINE_R_2, mode=Mode.SUBTRACT)
        with Locations((41.764273932, 35.938271055)):
            Circle(CAVITY2_OUTLINE_R, mode=Mode.SUBTRACT)
    extrude(amount=CAVITY2_DEPTH, mode=Mode.SUBTRACT)


solid = part.part
